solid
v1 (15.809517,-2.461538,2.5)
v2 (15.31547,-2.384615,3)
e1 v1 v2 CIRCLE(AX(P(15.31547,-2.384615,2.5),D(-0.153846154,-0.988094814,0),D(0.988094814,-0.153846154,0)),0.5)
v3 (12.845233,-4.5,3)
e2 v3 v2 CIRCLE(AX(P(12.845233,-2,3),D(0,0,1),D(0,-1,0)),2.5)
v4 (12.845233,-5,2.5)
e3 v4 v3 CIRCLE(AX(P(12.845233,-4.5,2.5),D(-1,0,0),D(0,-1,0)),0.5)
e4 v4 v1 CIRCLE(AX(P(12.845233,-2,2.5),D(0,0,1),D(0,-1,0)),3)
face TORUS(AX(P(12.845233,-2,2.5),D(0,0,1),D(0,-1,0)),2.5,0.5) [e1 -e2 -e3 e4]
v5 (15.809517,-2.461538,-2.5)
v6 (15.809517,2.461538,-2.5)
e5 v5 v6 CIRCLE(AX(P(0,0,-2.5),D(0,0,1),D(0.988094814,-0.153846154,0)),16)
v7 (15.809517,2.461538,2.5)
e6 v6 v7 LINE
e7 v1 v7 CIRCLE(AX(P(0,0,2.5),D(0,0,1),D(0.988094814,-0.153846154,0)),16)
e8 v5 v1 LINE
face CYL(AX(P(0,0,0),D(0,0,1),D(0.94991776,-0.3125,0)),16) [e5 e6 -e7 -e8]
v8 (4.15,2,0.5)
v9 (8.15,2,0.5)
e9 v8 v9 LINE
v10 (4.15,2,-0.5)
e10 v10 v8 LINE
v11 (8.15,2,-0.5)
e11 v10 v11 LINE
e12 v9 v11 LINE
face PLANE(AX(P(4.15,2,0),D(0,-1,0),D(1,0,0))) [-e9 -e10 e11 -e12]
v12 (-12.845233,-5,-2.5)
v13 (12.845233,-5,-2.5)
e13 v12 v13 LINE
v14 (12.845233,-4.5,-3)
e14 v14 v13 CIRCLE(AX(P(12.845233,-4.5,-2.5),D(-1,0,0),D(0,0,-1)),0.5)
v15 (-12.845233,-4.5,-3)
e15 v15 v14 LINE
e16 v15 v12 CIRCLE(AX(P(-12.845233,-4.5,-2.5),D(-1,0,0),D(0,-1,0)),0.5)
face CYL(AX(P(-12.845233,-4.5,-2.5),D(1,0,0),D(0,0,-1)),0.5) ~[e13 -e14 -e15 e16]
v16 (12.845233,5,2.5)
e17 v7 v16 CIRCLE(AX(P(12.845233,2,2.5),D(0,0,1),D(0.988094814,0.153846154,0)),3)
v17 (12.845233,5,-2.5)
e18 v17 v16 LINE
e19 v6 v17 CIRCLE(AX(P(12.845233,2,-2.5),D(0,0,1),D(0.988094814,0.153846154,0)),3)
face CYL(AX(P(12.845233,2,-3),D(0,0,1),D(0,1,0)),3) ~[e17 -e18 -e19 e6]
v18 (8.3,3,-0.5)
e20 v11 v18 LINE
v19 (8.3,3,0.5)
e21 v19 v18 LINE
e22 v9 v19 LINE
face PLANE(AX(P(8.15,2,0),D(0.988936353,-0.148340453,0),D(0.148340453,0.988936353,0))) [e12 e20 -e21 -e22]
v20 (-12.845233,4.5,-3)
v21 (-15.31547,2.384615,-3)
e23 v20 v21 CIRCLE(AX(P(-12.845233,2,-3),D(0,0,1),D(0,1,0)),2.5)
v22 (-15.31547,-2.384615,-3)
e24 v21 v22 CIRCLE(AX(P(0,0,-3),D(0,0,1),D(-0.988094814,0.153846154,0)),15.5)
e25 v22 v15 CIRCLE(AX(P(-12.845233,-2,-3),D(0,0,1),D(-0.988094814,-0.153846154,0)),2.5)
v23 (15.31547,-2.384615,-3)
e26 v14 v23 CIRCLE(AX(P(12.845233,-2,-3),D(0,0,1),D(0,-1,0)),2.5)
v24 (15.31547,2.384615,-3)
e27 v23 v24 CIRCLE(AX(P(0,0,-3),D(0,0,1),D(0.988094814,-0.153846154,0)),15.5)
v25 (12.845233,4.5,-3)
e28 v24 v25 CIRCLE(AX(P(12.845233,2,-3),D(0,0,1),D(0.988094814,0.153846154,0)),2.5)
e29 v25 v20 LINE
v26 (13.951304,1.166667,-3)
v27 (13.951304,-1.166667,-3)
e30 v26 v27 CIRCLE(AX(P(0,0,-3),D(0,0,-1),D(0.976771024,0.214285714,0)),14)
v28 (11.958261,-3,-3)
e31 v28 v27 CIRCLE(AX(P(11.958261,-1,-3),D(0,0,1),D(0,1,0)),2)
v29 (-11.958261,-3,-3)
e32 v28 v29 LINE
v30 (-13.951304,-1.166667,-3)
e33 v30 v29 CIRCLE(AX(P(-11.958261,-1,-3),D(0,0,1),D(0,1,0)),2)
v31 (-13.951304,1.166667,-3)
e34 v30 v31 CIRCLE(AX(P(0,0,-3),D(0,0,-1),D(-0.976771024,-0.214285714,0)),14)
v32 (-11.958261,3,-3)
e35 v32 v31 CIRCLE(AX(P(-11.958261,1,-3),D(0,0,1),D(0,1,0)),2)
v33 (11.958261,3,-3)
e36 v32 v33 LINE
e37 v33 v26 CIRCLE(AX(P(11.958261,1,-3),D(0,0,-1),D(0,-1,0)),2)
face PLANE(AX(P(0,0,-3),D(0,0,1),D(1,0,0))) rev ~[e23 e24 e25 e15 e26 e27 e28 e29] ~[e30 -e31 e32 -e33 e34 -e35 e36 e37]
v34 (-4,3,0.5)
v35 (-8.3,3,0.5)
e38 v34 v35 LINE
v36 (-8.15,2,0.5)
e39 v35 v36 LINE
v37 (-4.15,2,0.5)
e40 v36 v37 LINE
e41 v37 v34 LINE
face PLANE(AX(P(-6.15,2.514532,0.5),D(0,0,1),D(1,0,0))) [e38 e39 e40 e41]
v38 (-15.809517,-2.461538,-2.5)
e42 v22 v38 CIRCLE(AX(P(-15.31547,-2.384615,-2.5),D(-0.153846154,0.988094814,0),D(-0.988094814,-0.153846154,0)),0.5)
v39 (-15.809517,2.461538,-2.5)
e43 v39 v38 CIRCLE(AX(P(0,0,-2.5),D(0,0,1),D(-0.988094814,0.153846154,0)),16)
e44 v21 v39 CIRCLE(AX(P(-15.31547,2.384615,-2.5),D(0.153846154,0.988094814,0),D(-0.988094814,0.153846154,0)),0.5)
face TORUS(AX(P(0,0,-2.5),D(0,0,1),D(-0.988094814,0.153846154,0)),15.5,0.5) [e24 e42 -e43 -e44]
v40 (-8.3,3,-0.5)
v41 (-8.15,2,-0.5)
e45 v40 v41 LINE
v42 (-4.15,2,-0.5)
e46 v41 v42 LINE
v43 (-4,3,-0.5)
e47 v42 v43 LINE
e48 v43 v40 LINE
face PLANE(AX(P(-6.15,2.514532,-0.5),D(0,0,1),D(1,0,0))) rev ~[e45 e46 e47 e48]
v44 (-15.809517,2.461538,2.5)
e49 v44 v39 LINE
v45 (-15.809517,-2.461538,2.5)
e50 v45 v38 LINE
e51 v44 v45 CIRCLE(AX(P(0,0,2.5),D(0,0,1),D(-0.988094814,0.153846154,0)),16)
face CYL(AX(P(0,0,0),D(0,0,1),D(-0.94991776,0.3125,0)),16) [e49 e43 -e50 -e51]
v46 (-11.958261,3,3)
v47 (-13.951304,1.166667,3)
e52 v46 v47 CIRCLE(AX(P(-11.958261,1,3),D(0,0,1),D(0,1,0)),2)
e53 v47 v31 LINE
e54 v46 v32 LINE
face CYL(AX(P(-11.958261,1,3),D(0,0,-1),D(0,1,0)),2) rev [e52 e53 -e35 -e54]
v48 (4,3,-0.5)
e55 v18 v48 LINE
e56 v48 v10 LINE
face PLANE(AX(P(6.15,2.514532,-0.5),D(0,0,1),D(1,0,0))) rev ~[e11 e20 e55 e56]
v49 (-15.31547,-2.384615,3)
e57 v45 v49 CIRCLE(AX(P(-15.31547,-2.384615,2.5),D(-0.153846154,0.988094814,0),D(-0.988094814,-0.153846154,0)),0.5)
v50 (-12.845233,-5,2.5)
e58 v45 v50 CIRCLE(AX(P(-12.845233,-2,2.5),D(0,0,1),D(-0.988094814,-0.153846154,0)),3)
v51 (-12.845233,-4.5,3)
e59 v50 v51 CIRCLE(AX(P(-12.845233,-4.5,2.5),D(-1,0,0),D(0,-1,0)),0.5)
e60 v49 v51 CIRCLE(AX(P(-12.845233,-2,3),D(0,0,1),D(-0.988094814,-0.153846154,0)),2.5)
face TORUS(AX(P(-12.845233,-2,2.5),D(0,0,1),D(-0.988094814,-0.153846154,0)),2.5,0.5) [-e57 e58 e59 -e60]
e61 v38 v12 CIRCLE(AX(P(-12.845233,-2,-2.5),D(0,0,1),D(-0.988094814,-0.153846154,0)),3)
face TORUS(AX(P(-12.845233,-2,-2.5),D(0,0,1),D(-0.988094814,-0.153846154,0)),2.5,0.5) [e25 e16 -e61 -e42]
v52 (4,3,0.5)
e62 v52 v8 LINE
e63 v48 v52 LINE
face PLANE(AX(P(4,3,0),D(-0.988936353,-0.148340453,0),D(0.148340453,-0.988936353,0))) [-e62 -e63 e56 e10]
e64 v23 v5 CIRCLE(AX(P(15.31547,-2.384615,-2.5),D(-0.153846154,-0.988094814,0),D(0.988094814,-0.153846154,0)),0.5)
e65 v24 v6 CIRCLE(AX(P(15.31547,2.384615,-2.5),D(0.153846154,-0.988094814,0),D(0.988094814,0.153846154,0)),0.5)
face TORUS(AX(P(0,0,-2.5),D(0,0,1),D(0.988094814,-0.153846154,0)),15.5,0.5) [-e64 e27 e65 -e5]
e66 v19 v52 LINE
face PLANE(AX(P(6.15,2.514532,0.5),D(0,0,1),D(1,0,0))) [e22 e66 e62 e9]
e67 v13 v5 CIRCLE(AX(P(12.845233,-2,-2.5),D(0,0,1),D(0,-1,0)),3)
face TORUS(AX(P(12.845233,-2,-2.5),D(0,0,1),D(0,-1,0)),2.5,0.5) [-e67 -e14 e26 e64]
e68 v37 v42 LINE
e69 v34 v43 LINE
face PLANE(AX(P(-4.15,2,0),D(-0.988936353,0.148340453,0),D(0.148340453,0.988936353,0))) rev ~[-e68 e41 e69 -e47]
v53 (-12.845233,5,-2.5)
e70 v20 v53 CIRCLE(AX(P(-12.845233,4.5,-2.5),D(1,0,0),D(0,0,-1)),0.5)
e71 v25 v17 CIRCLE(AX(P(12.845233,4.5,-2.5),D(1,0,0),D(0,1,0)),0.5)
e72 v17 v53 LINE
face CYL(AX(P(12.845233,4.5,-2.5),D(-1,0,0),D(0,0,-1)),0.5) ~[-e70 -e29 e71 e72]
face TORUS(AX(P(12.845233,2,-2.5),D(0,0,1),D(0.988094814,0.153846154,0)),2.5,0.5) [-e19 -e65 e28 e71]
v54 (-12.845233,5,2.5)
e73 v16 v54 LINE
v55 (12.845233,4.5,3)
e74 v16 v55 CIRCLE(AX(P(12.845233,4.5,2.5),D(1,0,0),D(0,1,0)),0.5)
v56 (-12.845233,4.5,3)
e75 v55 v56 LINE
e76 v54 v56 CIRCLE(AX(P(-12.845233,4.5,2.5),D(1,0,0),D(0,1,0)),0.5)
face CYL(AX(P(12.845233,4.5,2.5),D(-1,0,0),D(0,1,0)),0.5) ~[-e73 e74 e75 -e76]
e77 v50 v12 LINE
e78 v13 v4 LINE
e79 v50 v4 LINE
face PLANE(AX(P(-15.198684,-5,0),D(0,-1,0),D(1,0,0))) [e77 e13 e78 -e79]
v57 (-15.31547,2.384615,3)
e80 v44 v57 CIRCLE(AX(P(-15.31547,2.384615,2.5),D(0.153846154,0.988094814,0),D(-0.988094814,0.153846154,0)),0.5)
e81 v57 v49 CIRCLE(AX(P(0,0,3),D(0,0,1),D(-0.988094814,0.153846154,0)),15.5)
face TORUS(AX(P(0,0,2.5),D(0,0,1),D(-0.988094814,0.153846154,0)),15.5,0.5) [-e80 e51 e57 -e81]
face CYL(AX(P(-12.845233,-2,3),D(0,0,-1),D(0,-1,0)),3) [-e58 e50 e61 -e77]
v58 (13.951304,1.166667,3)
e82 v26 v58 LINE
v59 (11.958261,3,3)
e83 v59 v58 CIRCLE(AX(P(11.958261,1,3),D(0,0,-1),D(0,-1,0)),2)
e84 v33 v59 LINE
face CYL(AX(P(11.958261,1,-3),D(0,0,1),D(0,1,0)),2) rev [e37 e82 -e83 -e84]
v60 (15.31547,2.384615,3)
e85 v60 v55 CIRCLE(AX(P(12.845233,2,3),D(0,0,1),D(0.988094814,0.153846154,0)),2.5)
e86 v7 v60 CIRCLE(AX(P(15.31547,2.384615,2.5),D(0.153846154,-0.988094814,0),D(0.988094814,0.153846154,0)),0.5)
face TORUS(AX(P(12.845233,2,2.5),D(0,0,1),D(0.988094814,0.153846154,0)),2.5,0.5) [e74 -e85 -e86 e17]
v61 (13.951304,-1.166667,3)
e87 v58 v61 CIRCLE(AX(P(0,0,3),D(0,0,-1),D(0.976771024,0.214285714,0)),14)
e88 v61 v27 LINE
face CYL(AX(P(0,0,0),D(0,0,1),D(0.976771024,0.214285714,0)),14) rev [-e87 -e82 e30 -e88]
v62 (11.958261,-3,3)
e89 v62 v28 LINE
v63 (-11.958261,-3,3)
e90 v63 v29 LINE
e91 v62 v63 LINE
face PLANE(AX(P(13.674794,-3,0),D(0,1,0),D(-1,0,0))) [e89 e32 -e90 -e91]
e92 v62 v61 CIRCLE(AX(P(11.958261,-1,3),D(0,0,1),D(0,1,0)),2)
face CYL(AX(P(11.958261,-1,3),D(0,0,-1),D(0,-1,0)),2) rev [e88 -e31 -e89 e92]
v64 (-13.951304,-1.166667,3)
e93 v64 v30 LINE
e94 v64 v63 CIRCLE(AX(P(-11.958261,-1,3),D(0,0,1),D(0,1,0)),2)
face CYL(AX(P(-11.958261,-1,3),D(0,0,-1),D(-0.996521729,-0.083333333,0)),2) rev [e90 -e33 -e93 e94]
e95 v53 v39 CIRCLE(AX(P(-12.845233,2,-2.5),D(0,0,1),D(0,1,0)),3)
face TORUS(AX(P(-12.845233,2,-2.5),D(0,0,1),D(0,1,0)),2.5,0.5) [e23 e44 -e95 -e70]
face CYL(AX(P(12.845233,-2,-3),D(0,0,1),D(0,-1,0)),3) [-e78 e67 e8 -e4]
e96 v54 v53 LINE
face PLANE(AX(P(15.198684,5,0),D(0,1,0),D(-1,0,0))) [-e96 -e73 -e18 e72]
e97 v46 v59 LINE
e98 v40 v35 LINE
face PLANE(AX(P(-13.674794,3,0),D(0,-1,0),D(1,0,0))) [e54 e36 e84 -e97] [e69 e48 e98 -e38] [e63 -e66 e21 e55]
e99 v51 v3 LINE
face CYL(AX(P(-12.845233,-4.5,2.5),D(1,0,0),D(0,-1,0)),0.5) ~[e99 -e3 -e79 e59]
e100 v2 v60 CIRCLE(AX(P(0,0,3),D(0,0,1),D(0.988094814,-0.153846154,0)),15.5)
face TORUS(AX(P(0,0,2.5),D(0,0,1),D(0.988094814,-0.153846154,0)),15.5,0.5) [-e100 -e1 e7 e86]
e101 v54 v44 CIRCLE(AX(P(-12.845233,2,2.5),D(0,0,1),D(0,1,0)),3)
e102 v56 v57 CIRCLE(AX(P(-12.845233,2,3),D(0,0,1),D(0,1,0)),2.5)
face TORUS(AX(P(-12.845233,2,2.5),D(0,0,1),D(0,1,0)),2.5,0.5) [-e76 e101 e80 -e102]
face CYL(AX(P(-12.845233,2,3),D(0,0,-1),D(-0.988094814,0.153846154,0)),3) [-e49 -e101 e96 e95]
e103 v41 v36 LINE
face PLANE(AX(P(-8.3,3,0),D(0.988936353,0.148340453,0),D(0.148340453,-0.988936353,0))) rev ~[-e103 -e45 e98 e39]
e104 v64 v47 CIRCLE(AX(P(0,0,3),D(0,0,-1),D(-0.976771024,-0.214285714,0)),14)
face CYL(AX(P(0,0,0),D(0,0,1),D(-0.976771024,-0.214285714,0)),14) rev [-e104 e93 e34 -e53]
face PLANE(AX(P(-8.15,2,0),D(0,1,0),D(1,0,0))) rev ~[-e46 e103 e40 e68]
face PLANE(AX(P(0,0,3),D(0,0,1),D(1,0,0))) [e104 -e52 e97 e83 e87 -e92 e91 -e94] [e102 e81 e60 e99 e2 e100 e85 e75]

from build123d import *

# Parameters (mm, degrees)
F1_DEPTH = 3
F2_R     = 3
F3_R     = 2
F5_DEPTH = 0.5
F6_R     = 0.5


with BuildPart() as f1:
    # F0 (on Top) → F1 (new body, symmetric)
    with BuildSketch(Plane.XY):
        with BuildLine():
            Line((-15.1986841536, -5), (15.1986841536, -5))
            ThreePointArc((15.1986841536, -5), (16, 0), (15.1986841536, 5))
            Line((15.1986841536, 5), (-15.1986841536, 5))
            ThreePointArc((-15.1986841536, 5), (-16, 0), (-15.1986841536, -5))
        make_face()
        with BuildLine():
            ThreePointArc((13.6747943312, 3), (14, 0), (13.6747943312, -3))
            Line((13.6747943312, -3), (-13.6747943312, -3))
            ThreePointArc((-13.6747943312, -3), (-14, 0), (-13.6747943312, 3))
            Line((-13.6747943312, 3), (13.6747943312, 3))
        make_face(mode=Mode.SUBTRACT)
    extrude(amount=F1_DEPTH, both=True)

    # F2
    f2_edges = [f1.edges().sort_by_distance(p)[0] for p in [
        (-15.198684, 5, 0),
        (15.198684, 5, 0),
        (15.198684, -5, 0),
        (-15.198684, -5, 0),
    ]]
    fillet(f2_edges, radius=F2_R)

    # F3
    f3_edges = [f1.edges().sort_by_distance(p)[0] for p in [
        (13.674794, 3, 0),
        (13.674794, -3, 0),
        (-13.674794, -3, 0),
        (-13.674794, 3, 0),
    ]]
    fillet(f3_edges, radius=F3_R)

    # F4 (on Top) → F5 (join, symmetric)
    with BuildSketch(Plane.XY):
        Polygon((-4, 3), (-8.3, 3), (-8.15, 2), (-4.15, 2), align=None)
        Polygon((8.3, 3), (4, 3), (4.15, 2), (8.15, 2), align=None)
    extrude(amount=F5_DEPTH, both=True)

    # F6
    f6_edges = [f1.edges().sort_by_distance(p)[0] for p in [
        (0, -5, 3),
        (14.796563, -4.278664, 3),
        (16, 0, 3),
        (14.796563, 4.278664, 3),
        (0, 5, 3),
        (-14.796563, -4.278664, 3),
        (-16, 0, 3),
        (-14.796563, 4.278664, 3),
        (-16, 0, -3),
        (-14.796563, 4.278664, -3),
        (-14.796563, -4.278664, -3),
        (0, -5, -3),
        (0, 5, -3),
        (14.796563, -4.278664, -3),
        (16, 0, -3),
        (14.796563, 4.278664, -3),
    ]]
    fillet(f6_edges, radius=F6_R)


solid = f1.part
